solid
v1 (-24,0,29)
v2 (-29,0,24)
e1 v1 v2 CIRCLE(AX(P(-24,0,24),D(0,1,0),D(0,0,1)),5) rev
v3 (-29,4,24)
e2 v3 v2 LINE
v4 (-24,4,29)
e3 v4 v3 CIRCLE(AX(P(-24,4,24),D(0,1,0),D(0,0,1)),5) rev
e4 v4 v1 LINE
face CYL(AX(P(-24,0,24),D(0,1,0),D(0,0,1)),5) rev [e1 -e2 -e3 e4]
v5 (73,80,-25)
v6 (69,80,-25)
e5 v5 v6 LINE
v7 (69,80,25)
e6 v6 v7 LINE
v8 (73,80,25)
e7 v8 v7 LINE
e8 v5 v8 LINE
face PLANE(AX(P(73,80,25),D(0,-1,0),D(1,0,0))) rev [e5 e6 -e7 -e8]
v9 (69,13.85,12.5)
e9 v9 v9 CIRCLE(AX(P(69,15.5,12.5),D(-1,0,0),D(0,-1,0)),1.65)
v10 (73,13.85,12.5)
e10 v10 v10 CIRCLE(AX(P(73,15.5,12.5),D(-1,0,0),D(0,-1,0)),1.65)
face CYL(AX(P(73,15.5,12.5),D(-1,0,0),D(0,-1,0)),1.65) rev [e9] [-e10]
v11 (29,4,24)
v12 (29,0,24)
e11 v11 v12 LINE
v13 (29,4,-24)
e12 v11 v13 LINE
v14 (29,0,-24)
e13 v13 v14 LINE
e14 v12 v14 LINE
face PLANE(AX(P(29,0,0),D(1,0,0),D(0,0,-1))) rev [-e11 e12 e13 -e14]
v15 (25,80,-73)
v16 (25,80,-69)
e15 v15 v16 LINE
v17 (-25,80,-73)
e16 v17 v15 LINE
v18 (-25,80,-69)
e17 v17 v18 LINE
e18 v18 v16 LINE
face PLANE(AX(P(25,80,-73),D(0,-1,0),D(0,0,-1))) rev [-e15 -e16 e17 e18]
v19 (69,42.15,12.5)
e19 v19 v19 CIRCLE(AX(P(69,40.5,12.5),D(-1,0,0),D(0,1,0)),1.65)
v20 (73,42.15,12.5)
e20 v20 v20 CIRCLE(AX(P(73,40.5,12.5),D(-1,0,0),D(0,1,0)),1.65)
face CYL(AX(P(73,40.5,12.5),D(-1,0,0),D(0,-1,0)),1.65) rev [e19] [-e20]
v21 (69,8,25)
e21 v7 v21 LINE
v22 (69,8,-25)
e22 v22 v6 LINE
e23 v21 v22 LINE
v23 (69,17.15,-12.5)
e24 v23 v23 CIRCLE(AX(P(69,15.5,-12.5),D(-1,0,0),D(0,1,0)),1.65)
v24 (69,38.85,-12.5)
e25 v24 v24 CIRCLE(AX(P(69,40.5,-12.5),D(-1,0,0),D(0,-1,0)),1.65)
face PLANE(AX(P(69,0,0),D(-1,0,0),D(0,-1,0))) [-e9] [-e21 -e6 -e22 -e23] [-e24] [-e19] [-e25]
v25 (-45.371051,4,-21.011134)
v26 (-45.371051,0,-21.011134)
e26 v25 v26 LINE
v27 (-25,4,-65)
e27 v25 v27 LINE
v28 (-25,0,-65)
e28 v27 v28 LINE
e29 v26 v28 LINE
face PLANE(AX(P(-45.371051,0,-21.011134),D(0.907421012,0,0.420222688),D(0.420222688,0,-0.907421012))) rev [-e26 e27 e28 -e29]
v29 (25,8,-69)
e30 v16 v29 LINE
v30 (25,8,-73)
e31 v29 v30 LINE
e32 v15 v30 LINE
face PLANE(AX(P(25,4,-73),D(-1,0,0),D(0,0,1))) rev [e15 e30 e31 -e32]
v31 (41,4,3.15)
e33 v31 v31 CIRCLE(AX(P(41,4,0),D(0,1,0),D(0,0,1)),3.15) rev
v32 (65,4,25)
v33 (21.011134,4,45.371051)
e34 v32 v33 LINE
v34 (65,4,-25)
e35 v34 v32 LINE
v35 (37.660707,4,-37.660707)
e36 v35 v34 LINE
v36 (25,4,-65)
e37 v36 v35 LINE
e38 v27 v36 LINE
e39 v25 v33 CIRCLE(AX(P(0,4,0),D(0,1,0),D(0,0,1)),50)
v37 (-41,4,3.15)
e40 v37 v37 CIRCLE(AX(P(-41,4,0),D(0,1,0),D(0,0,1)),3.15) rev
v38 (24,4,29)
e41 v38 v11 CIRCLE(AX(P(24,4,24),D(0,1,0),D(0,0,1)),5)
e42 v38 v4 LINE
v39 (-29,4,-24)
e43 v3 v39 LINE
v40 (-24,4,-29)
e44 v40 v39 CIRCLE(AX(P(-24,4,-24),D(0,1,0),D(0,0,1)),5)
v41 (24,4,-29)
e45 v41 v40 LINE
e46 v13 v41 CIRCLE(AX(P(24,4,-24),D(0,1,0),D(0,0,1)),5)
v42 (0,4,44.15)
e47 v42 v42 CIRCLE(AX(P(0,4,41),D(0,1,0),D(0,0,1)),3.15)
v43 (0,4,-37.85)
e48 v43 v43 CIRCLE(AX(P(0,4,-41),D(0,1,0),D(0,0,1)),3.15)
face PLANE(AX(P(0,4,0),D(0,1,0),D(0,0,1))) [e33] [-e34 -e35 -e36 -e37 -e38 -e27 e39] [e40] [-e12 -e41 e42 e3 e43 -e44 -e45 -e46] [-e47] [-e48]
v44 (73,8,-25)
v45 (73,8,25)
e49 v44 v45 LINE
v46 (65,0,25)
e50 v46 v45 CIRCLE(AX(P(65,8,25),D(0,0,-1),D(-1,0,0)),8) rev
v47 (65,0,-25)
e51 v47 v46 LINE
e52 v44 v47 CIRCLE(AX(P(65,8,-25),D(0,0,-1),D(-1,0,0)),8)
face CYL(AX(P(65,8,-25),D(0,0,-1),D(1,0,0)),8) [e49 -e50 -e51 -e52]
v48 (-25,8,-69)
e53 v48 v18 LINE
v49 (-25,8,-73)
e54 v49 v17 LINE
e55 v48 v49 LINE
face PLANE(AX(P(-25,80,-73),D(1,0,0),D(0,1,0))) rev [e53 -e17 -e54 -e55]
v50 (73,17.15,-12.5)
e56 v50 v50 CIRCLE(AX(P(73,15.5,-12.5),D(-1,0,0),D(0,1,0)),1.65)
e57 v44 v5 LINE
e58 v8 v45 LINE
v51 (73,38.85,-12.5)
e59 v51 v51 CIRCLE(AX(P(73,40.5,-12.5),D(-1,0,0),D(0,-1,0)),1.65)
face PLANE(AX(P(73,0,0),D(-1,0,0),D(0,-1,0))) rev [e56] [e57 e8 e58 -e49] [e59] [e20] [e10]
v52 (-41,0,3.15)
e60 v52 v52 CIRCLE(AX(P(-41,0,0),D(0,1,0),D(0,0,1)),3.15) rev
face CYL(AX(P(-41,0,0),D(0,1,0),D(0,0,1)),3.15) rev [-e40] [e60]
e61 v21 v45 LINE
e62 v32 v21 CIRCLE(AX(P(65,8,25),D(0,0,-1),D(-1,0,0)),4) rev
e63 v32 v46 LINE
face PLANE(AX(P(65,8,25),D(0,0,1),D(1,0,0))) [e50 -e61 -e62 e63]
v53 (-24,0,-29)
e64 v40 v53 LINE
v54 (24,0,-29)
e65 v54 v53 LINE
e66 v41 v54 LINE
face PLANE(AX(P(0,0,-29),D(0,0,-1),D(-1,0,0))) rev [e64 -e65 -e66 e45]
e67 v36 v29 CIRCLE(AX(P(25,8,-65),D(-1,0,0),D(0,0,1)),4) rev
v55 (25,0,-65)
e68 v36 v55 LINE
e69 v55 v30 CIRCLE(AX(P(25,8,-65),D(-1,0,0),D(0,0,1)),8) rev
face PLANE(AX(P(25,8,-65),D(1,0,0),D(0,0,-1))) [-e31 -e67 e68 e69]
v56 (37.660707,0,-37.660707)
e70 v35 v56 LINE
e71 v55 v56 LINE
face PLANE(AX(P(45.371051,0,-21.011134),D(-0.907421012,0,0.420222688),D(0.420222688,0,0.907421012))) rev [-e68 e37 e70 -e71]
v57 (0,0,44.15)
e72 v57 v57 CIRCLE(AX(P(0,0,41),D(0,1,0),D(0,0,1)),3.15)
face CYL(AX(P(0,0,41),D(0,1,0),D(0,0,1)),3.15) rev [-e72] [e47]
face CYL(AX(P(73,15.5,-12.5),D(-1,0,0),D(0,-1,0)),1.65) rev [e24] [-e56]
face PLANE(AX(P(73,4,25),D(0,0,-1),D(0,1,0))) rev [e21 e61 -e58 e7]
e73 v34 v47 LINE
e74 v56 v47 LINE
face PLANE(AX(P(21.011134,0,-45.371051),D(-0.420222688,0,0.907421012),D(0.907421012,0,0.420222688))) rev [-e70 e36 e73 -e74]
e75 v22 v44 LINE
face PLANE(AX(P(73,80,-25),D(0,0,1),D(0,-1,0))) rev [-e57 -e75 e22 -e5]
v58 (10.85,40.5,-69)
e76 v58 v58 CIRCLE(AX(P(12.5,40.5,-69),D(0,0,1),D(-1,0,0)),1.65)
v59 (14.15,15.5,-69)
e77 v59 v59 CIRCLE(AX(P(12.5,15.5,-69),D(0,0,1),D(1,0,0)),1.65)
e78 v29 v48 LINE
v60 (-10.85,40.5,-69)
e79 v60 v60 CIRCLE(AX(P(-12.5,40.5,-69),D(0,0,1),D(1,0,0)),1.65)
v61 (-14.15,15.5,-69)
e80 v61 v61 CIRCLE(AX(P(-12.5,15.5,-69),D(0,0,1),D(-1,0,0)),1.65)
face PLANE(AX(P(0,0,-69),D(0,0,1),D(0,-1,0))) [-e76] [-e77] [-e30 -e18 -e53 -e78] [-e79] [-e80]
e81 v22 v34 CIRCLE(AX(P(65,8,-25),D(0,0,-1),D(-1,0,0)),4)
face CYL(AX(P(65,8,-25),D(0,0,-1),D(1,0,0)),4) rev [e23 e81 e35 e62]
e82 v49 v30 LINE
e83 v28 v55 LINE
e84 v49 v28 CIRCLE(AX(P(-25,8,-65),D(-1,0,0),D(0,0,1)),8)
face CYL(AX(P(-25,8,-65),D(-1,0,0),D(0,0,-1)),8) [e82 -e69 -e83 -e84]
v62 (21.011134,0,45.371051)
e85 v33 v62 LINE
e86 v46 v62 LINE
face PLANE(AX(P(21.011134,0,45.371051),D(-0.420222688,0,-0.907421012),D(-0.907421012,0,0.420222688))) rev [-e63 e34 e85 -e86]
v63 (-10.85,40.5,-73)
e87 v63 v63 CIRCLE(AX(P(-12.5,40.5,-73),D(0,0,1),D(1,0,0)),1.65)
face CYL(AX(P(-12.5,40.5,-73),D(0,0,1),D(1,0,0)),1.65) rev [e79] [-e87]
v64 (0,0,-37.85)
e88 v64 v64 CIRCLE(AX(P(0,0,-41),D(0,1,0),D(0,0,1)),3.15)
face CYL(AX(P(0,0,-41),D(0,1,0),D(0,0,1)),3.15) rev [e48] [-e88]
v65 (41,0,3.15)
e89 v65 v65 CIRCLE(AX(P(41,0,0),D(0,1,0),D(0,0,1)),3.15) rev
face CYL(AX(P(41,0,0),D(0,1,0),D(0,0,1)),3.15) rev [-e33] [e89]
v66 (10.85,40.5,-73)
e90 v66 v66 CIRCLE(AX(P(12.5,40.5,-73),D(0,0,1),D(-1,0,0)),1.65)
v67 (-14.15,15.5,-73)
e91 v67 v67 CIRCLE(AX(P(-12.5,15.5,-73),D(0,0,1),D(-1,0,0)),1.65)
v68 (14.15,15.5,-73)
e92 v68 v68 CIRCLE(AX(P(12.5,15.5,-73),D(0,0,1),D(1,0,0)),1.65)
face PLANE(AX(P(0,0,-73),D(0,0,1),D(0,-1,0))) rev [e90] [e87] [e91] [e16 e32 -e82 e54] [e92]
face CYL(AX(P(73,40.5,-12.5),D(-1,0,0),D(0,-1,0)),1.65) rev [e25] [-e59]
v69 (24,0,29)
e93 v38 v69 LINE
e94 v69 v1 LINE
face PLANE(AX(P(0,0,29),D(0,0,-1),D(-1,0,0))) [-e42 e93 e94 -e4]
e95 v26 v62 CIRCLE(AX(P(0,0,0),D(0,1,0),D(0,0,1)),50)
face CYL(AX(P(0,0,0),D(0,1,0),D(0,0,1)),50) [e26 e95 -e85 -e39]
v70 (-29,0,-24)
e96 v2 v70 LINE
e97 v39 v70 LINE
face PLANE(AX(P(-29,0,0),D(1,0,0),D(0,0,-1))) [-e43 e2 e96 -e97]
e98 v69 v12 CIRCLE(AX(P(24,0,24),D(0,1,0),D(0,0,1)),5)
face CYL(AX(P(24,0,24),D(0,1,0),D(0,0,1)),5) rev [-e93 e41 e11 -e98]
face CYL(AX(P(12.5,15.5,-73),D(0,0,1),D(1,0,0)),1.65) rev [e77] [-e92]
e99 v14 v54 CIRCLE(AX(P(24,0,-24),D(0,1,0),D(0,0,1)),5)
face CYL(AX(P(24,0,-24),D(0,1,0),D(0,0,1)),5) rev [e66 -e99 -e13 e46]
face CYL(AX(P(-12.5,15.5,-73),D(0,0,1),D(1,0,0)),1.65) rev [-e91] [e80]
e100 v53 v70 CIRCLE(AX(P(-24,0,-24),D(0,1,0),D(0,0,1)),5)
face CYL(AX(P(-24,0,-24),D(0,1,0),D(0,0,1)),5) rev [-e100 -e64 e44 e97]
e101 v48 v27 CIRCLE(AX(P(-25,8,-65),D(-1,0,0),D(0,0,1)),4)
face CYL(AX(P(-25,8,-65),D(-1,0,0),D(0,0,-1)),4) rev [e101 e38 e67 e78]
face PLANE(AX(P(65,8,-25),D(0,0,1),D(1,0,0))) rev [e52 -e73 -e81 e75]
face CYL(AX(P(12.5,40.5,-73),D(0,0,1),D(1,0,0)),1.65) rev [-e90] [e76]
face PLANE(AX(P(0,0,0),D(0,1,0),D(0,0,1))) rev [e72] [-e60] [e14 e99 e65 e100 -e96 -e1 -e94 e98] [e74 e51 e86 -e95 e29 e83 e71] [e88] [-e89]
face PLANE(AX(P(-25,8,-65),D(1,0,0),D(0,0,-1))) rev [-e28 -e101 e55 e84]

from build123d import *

# Parameters (mm, degrees)
SKETCH_1_R                  = 3.15
EXTRUDE_1_DEPTH             = 4
SM_EDGE_FLANGE_1_DEPTH      = 50
SM_EDGE_FLANGE_1_BEND_DEPTH = 50
SKETCH_21_R                 = 1.65
CUT_EXTRUDE_1_DEPTH         = 161.903697907
SKETCH_22_R                 = 1.65
CUT_EXTRUDE_2_DEPTH         = 161.903697907


# Sheet-metal steps are written as plain solids
with BuildPart() as part:
    # Sketch 1 → 凸台-拉伸1 (new body)
    with BuildSketch(Plane(origin=(0, 0, 0), x_dir=(1, 0, 0), z_dir=(0, 1, 0))):
        with BuildLine():
            Line((-25, 65), (-45.371050591, 21.011134388))
            ThreePointArc((-45.371050591, 21.011134388), (-35.355339059, -35.355339059), (21.011134388, -45.371050591))
            Line((21.011134388, -45.371050591), (65, -25))
            Line((65, -25), (65, 25))
            Line((65, 25), (37.660706721, 37.660706721))
            Line((37.660706721, 37.660706721), (25, 65))
            Line((25, 65), (-25, 65))
        make_face()
        with Locations(Location((0, 41, 0), (0, 0, 270))):
            Circle(SKETCH_1_R, mode=Mode.SUBTRACT)
        with Locations(Location((0, -41, 0), (0, 0, 270))):
            Circle(SKETCH_1_R, mode=Mode.SUBTRACT)
        with Locations(Location((-41, 0, 0), (0, 0, 270))):
            Circle(SKETCH_1_R, mode=Mode.SUBTRACT)
        with BuildLine():
            ThreePointArc((29, -24), (27.535533906, -27.535533906), (24, -29))
            Line((24, -29), (-24, -29))
            ThreePointArc((-24, -29), (-27.535533906, -27.535533906), (-29, -24))
            Line((-29, -24), (-29, 24))
            ThreePointArc((-29, 24), (-27.535533906, 27.535533906), (-24, 29))
            Line((-24, 29), (24, 29))
            ThreePointArc((24, 29), (27.535533906, 27.535533906), (29, 24))
            Line((29, 24), (29, -24))
        make_face(mode=Mode.SUBTRACT)
        with Locations(Location((41, 0, 0), (0, 0, 270))):
            Circle(SKETCH_1_R, mode=Mode.SUBTRACT)
    extrude(amount=EXTRUDE_1_DEPTH)

    # 边线-法兰1 section (across the edge) → 边线-法兰1 (add)
    with BuildSketch(Plane(origin=(69, 4, 25), x_dir=(-1, 0, 0), z_dir=(0, 0, -1))):
        with BuildLine():
            Line((-4, 4), (-4, 76))
            Line((-4, 76), (0, 76))
            Line((0, 76), (0, 4))
            ThreePointArc((0, 4), (1.171572875, 1.171572875), (4, 0))
            Line((4, 0), (4, -4))
            ThreePointArc((4, -4), (-1.656854249, -1.656854249), (-4, 4))
        make_face()
    extrude(amount=SM_EDGE_FLANGE_1_DEPTH)

    # 边线-法兰1 section 2 (across the edge) → 边线-法兰1 bend (add)
    with BuildSketch(Plane(origin=(25, 4, -69), x_dir=(0, 0, 1), z_dir=(-1, 0, 0))):
        with BuildLine():
            Line((-4, 4), (-4, 76))
            Line((-4, 76), (0, 76))
            Line((0, 76), (0, 4))
            ThreePointArc((0, 4), (1.171572875, 1.171572875), (4, 0))
            Line((4, 0), (4, -4))
            ThreePointArc((4, -4), (-1.656854249, -1.656854249), (-4, 4))
        make_face()
    extrude(amount=SM_EDGE_FLANGE_1_BEND_DEPTH)

    # 草图21 → 切除-拉伸1 (cut, through all)
    with BuildSketch(Plane.XY.offset(-69)):
        with Locations((-12.5, 40.5)):
            Circle(SKETCH_21_R)
        with Locations(Location((12.5, 40.5, 0), (0, 0, 180))):
            Circle(SKETCH_21_R)
        with Locations((12.5, 15.5)):
            Circle(SKETCH_21_R)
        with Locations(Location((-12.5, 15.5, 0), (0, 0, 180))):
            Circle(SKETCH_21_R)
    extrude(amount=-CUT_EXTRUDE_1_DEPTH, mode=Mode.SUBTRACT)

    # 草图22 → 切除-拉伸2 (cut, through all)
    with BuildSketch(Plane.ZY.offset(-69)):
        with Locations(Location((-12.5, 40.5, 0), (0, 0, 270))):
            Circle(SKETCH_22_R)
        with Locations(Location((12.5, 40.5, 0), (0, 0, 90))):
            Circle(SKETCH_22_R)
        with Locations(Location((12.5, 15.5, 0), (0, 0, 270))):
            Circle(SKETCH_22_R)
        with Locations(Location((-12.5, 15.5, 0), (0, 0, 90))):
            Circle(SKETCH_22_R)
    extrude(amount=-CUT_EXTRUDE_2_DEPTH, mode=Mode.SUBTRACT)


solid = part.part
